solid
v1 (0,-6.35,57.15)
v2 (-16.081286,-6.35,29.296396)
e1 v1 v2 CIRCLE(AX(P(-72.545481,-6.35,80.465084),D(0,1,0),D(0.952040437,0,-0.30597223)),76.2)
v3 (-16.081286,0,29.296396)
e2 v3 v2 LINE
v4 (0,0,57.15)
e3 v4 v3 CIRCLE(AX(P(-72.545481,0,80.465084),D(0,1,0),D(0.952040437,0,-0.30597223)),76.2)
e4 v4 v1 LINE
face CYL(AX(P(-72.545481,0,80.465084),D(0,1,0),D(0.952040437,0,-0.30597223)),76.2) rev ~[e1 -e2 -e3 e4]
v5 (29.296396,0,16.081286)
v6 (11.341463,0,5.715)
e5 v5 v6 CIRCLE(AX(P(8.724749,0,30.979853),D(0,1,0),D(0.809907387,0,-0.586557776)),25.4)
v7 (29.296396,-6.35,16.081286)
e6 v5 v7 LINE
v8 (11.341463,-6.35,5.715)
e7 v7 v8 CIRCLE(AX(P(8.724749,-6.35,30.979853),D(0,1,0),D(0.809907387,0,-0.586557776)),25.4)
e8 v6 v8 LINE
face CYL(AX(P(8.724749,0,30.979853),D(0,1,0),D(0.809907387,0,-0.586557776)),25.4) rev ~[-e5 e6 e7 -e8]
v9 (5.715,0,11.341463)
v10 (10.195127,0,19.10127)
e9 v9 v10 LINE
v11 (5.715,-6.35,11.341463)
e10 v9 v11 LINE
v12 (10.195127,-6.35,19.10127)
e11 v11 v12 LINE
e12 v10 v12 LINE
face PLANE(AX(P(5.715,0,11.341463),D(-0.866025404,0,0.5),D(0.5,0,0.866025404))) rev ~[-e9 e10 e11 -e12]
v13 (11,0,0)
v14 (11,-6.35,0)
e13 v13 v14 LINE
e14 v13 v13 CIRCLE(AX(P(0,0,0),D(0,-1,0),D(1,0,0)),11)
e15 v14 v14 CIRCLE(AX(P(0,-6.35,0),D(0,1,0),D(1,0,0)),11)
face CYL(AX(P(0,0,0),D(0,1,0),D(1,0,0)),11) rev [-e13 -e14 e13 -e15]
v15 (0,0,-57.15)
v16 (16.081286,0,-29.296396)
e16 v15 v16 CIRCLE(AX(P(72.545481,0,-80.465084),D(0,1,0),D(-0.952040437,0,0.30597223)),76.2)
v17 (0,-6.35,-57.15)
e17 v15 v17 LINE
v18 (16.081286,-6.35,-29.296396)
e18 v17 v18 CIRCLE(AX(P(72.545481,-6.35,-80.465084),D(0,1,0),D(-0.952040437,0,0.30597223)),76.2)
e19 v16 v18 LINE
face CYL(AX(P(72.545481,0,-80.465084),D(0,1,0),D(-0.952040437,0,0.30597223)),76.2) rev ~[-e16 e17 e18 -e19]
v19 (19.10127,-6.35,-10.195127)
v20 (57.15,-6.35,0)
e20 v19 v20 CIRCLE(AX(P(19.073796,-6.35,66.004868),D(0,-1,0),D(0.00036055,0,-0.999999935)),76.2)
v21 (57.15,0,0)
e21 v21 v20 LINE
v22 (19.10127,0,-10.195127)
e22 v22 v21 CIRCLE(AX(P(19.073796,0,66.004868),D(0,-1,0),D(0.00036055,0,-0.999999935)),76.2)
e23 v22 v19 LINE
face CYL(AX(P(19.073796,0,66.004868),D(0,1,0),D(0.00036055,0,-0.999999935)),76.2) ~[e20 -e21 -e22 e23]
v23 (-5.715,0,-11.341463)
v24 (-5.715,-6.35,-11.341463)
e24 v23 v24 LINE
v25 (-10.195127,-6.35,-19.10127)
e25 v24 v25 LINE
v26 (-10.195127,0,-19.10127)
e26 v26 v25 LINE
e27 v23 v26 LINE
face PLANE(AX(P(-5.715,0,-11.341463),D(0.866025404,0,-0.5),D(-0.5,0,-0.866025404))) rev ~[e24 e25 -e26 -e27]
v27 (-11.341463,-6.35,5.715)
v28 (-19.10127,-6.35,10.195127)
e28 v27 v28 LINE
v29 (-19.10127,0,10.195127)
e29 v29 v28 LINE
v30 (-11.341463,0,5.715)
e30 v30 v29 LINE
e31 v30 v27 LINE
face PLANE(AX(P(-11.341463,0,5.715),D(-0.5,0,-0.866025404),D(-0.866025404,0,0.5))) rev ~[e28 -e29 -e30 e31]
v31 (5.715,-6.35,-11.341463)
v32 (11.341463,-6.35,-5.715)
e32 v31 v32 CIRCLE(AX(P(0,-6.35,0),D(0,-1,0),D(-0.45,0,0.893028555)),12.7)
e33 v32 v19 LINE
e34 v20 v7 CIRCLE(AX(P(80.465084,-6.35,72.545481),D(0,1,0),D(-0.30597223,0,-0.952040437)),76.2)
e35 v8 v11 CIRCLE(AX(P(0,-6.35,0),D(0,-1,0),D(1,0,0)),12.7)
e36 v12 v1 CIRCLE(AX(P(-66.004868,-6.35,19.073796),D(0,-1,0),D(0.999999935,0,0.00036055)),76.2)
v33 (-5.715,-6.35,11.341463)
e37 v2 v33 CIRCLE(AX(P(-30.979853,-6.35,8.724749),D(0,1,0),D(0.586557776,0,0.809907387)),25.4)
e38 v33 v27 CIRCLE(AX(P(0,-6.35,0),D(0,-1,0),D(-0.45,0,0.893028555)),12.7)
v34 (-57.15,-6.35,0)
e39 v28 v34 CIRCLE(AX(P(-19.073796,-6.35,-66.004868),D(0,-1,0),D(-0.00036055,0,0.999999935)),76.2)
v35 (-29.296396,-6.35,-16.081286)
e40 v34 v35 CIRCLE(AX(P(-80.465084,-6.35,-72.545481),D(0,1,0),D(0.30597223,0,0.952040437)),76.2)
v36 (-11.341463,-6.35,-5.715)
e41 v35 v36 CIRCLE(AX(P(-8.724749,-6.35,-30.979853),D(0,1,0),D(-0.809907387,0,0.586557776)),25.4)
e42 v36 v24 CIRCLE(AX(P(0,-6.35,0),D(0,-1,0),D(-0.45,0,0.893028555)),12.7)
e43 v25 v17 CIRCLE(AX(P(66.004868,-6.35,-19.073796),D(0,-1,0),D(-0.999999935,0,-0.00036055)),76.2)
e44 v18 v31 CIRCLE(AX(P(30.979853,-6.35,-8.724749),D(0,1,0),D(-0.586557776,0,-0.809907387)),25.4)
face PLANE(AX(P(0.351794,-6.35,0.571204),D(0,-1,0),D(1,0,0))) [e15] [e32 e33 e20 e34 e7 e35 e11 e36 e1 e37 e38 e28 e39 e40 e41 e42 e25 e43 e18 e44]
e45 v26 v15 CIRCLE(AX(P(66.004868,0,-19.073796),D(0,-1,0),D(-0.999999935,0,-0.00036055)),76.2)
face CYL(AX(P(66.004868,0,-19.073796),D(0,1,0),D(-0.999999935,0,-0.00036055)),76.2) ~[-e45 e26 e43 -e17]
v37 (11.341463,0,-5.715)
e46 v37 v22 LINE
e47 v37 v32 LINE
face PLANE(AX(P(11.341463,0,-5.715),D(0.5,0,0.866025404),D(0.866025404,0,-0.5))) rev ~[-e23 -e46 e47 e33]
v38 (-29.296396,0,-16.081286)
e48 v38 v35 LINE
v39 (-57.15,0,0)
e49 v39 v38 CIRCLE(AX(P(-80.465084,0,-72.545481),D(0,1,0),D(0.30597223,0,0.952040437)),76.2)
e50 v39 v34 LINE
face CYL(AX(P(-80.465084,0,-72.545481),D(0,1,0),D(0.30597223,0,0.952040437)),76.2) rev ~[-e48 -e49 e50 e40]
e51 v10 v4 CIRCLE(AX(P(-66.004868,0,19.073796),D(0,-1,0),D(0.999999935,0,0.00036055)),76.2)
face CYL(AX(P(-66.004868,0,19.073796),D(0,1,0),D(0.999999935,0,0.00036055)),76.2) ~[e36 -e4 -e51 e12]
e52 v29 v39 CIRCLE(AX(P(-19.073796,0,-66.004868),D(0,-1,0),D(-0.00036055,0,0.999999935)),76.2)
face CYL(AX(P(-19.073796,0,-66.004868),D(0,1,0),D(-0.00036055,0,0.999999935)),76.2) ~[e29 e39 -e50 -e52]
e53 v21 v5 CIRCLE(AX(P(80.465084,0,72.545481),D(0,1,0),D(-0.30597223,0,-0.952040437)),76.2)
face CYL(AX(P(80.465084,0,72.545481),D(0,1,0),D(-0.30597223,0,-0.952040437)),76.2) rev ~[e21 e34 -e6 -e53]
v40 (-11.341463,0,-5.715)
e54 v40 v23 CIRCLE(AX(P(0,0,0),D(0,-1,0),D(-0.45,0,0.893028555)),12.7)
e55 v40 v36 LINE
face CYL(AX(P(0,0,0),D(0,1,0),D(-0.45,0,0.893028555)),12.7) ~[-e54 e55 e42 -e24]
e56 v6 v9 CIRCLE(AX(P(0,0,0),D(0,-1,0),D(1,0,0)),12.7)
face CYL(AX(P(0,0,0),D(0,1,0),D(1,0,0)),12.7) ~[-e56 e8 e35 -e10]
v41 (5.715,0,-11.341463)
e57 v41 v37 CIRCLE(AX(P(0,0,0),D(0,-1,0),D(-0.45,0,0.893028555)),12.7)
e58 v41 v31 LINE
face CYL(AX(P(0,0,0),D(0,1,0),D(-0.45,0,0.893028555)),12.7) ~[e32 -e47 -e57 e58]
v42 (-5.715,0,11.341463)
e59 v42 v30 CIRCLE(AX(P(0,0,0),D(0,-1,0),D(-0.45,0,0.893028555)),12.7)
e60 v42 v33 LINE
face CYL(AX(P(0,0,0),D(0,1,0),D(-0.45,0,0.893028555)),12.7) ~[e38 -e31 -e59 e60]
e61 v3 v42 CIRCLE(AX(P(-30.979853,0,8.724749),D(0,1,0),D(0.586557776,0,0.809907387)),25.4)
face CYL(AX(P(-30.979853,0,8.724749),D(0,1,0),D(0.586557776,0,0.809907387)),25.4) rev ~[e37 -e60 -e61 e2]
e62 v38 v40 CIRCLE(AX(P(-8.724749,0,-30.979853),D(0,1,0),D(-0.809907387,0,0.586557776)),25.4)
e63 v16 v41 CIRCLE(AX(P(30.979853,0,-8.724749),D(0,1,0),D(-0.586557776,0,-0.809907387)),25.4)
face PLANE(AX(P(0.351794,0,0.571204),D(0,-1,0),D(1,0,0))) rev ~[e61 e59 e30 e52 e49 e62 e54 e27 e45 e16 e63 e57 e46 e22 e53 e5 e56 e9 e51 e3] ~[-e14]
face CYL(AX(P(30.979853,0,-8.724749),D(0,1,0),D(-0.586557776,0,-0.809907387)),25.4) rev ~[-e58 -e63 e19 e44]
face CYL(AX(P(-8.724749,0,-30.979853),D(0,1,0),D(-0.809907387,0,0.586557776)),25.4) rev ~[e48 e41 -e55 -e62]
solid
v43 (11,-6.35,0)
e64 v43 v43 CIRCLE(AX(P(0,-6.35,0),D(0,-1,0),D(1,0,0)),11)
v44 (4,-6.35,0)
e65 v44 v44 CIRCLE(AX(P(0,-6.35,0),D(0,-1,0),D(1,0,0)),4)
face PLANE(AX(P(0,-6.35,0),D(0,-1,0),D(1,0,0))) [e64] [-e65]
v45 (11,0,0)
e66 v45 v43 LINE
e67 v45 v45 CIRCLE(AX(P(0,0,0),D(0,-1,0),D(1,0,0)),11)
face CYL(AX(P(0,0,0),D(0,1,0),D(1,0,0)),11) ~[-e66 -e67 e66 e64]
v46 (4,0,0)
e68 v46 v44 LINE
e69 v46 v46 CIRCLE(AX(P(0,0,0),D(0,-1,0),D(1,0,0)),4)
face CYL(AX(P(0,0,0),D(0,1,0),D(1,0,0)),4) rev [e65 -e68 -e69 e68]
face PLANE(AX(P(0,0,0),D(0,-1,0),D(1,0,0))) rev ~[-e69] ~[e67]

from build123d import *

# Parameters (mm, degrees)
F1_R     = 11
F2_DEPTH = 6.35
F3_COUNT = 4
F4_R     = 11
F4_R_2   = 4
F5_DEPTH = 6.35


with BuildPart() as f2:
    # F1 (on Front) → F2 (new body)
    with BuildSketch(Plane.XZ):
        with BuildLine():
            ThreePointArc((-5.715, 11.3414626482), (-6.6599361859, -10.8136603424), (12.7, 0))
            ThreePointArc((12.7, 0), (10.8136603424, 6.6599361859), (5.715, 11.3414626482))
            ThreePointArc((5.715, 11.3414626482), (0, 12.7), (-5.715, 11.3414626482))
        make_face()
        Circle(F1_R, mode=Mode.SUBTRACT)
        with BuildLine():
            ThreePointArc((-5.715, 11.3414626482), (0, 12.7), (5.715, 11.3414626482))
            Line((5.715, 11.3414626482), (10.1951265992, 19.1012695423))
            ThreePointArc((10.1951265992, 19.1012695423), (7.5986795153, 38.7958068413), (0, 57.15))
            ThreePointArc((0, 57.15), (-6.5543455598, 42.3650839343), (-16.0812856856, 29.2963961415))
            ThreePointArc((-16.0812856856, 29.2963961415), (-8.9828079425, 21.4247485151), (-5.715, 11.3414626482))
        make_face()
    extrude(amount=F2_DEPTH)

    # F3: F2 ×4 about axis
    f3_axis = Axis((0, -6.35, 0), (0, -1, 0))


with BuildPart() as f2_1:
    add(f2.part)
    for i in range(1, F3_COUNT):
        add(f2.part.rotate(f3_axis, i * 360 / F3_COUNT))


with BuildPart() as f5:
    # F4 (on Front) → F5 (new body)
    with BuildSketch(Plane.XZ):
        Circle(F4_R)
        Circle(F4_R_2, mode=Mode.SUBTRACT)
    extrude(amount=F5_DEPTH)


solid = Compound([f2_1.part, f5.part])
